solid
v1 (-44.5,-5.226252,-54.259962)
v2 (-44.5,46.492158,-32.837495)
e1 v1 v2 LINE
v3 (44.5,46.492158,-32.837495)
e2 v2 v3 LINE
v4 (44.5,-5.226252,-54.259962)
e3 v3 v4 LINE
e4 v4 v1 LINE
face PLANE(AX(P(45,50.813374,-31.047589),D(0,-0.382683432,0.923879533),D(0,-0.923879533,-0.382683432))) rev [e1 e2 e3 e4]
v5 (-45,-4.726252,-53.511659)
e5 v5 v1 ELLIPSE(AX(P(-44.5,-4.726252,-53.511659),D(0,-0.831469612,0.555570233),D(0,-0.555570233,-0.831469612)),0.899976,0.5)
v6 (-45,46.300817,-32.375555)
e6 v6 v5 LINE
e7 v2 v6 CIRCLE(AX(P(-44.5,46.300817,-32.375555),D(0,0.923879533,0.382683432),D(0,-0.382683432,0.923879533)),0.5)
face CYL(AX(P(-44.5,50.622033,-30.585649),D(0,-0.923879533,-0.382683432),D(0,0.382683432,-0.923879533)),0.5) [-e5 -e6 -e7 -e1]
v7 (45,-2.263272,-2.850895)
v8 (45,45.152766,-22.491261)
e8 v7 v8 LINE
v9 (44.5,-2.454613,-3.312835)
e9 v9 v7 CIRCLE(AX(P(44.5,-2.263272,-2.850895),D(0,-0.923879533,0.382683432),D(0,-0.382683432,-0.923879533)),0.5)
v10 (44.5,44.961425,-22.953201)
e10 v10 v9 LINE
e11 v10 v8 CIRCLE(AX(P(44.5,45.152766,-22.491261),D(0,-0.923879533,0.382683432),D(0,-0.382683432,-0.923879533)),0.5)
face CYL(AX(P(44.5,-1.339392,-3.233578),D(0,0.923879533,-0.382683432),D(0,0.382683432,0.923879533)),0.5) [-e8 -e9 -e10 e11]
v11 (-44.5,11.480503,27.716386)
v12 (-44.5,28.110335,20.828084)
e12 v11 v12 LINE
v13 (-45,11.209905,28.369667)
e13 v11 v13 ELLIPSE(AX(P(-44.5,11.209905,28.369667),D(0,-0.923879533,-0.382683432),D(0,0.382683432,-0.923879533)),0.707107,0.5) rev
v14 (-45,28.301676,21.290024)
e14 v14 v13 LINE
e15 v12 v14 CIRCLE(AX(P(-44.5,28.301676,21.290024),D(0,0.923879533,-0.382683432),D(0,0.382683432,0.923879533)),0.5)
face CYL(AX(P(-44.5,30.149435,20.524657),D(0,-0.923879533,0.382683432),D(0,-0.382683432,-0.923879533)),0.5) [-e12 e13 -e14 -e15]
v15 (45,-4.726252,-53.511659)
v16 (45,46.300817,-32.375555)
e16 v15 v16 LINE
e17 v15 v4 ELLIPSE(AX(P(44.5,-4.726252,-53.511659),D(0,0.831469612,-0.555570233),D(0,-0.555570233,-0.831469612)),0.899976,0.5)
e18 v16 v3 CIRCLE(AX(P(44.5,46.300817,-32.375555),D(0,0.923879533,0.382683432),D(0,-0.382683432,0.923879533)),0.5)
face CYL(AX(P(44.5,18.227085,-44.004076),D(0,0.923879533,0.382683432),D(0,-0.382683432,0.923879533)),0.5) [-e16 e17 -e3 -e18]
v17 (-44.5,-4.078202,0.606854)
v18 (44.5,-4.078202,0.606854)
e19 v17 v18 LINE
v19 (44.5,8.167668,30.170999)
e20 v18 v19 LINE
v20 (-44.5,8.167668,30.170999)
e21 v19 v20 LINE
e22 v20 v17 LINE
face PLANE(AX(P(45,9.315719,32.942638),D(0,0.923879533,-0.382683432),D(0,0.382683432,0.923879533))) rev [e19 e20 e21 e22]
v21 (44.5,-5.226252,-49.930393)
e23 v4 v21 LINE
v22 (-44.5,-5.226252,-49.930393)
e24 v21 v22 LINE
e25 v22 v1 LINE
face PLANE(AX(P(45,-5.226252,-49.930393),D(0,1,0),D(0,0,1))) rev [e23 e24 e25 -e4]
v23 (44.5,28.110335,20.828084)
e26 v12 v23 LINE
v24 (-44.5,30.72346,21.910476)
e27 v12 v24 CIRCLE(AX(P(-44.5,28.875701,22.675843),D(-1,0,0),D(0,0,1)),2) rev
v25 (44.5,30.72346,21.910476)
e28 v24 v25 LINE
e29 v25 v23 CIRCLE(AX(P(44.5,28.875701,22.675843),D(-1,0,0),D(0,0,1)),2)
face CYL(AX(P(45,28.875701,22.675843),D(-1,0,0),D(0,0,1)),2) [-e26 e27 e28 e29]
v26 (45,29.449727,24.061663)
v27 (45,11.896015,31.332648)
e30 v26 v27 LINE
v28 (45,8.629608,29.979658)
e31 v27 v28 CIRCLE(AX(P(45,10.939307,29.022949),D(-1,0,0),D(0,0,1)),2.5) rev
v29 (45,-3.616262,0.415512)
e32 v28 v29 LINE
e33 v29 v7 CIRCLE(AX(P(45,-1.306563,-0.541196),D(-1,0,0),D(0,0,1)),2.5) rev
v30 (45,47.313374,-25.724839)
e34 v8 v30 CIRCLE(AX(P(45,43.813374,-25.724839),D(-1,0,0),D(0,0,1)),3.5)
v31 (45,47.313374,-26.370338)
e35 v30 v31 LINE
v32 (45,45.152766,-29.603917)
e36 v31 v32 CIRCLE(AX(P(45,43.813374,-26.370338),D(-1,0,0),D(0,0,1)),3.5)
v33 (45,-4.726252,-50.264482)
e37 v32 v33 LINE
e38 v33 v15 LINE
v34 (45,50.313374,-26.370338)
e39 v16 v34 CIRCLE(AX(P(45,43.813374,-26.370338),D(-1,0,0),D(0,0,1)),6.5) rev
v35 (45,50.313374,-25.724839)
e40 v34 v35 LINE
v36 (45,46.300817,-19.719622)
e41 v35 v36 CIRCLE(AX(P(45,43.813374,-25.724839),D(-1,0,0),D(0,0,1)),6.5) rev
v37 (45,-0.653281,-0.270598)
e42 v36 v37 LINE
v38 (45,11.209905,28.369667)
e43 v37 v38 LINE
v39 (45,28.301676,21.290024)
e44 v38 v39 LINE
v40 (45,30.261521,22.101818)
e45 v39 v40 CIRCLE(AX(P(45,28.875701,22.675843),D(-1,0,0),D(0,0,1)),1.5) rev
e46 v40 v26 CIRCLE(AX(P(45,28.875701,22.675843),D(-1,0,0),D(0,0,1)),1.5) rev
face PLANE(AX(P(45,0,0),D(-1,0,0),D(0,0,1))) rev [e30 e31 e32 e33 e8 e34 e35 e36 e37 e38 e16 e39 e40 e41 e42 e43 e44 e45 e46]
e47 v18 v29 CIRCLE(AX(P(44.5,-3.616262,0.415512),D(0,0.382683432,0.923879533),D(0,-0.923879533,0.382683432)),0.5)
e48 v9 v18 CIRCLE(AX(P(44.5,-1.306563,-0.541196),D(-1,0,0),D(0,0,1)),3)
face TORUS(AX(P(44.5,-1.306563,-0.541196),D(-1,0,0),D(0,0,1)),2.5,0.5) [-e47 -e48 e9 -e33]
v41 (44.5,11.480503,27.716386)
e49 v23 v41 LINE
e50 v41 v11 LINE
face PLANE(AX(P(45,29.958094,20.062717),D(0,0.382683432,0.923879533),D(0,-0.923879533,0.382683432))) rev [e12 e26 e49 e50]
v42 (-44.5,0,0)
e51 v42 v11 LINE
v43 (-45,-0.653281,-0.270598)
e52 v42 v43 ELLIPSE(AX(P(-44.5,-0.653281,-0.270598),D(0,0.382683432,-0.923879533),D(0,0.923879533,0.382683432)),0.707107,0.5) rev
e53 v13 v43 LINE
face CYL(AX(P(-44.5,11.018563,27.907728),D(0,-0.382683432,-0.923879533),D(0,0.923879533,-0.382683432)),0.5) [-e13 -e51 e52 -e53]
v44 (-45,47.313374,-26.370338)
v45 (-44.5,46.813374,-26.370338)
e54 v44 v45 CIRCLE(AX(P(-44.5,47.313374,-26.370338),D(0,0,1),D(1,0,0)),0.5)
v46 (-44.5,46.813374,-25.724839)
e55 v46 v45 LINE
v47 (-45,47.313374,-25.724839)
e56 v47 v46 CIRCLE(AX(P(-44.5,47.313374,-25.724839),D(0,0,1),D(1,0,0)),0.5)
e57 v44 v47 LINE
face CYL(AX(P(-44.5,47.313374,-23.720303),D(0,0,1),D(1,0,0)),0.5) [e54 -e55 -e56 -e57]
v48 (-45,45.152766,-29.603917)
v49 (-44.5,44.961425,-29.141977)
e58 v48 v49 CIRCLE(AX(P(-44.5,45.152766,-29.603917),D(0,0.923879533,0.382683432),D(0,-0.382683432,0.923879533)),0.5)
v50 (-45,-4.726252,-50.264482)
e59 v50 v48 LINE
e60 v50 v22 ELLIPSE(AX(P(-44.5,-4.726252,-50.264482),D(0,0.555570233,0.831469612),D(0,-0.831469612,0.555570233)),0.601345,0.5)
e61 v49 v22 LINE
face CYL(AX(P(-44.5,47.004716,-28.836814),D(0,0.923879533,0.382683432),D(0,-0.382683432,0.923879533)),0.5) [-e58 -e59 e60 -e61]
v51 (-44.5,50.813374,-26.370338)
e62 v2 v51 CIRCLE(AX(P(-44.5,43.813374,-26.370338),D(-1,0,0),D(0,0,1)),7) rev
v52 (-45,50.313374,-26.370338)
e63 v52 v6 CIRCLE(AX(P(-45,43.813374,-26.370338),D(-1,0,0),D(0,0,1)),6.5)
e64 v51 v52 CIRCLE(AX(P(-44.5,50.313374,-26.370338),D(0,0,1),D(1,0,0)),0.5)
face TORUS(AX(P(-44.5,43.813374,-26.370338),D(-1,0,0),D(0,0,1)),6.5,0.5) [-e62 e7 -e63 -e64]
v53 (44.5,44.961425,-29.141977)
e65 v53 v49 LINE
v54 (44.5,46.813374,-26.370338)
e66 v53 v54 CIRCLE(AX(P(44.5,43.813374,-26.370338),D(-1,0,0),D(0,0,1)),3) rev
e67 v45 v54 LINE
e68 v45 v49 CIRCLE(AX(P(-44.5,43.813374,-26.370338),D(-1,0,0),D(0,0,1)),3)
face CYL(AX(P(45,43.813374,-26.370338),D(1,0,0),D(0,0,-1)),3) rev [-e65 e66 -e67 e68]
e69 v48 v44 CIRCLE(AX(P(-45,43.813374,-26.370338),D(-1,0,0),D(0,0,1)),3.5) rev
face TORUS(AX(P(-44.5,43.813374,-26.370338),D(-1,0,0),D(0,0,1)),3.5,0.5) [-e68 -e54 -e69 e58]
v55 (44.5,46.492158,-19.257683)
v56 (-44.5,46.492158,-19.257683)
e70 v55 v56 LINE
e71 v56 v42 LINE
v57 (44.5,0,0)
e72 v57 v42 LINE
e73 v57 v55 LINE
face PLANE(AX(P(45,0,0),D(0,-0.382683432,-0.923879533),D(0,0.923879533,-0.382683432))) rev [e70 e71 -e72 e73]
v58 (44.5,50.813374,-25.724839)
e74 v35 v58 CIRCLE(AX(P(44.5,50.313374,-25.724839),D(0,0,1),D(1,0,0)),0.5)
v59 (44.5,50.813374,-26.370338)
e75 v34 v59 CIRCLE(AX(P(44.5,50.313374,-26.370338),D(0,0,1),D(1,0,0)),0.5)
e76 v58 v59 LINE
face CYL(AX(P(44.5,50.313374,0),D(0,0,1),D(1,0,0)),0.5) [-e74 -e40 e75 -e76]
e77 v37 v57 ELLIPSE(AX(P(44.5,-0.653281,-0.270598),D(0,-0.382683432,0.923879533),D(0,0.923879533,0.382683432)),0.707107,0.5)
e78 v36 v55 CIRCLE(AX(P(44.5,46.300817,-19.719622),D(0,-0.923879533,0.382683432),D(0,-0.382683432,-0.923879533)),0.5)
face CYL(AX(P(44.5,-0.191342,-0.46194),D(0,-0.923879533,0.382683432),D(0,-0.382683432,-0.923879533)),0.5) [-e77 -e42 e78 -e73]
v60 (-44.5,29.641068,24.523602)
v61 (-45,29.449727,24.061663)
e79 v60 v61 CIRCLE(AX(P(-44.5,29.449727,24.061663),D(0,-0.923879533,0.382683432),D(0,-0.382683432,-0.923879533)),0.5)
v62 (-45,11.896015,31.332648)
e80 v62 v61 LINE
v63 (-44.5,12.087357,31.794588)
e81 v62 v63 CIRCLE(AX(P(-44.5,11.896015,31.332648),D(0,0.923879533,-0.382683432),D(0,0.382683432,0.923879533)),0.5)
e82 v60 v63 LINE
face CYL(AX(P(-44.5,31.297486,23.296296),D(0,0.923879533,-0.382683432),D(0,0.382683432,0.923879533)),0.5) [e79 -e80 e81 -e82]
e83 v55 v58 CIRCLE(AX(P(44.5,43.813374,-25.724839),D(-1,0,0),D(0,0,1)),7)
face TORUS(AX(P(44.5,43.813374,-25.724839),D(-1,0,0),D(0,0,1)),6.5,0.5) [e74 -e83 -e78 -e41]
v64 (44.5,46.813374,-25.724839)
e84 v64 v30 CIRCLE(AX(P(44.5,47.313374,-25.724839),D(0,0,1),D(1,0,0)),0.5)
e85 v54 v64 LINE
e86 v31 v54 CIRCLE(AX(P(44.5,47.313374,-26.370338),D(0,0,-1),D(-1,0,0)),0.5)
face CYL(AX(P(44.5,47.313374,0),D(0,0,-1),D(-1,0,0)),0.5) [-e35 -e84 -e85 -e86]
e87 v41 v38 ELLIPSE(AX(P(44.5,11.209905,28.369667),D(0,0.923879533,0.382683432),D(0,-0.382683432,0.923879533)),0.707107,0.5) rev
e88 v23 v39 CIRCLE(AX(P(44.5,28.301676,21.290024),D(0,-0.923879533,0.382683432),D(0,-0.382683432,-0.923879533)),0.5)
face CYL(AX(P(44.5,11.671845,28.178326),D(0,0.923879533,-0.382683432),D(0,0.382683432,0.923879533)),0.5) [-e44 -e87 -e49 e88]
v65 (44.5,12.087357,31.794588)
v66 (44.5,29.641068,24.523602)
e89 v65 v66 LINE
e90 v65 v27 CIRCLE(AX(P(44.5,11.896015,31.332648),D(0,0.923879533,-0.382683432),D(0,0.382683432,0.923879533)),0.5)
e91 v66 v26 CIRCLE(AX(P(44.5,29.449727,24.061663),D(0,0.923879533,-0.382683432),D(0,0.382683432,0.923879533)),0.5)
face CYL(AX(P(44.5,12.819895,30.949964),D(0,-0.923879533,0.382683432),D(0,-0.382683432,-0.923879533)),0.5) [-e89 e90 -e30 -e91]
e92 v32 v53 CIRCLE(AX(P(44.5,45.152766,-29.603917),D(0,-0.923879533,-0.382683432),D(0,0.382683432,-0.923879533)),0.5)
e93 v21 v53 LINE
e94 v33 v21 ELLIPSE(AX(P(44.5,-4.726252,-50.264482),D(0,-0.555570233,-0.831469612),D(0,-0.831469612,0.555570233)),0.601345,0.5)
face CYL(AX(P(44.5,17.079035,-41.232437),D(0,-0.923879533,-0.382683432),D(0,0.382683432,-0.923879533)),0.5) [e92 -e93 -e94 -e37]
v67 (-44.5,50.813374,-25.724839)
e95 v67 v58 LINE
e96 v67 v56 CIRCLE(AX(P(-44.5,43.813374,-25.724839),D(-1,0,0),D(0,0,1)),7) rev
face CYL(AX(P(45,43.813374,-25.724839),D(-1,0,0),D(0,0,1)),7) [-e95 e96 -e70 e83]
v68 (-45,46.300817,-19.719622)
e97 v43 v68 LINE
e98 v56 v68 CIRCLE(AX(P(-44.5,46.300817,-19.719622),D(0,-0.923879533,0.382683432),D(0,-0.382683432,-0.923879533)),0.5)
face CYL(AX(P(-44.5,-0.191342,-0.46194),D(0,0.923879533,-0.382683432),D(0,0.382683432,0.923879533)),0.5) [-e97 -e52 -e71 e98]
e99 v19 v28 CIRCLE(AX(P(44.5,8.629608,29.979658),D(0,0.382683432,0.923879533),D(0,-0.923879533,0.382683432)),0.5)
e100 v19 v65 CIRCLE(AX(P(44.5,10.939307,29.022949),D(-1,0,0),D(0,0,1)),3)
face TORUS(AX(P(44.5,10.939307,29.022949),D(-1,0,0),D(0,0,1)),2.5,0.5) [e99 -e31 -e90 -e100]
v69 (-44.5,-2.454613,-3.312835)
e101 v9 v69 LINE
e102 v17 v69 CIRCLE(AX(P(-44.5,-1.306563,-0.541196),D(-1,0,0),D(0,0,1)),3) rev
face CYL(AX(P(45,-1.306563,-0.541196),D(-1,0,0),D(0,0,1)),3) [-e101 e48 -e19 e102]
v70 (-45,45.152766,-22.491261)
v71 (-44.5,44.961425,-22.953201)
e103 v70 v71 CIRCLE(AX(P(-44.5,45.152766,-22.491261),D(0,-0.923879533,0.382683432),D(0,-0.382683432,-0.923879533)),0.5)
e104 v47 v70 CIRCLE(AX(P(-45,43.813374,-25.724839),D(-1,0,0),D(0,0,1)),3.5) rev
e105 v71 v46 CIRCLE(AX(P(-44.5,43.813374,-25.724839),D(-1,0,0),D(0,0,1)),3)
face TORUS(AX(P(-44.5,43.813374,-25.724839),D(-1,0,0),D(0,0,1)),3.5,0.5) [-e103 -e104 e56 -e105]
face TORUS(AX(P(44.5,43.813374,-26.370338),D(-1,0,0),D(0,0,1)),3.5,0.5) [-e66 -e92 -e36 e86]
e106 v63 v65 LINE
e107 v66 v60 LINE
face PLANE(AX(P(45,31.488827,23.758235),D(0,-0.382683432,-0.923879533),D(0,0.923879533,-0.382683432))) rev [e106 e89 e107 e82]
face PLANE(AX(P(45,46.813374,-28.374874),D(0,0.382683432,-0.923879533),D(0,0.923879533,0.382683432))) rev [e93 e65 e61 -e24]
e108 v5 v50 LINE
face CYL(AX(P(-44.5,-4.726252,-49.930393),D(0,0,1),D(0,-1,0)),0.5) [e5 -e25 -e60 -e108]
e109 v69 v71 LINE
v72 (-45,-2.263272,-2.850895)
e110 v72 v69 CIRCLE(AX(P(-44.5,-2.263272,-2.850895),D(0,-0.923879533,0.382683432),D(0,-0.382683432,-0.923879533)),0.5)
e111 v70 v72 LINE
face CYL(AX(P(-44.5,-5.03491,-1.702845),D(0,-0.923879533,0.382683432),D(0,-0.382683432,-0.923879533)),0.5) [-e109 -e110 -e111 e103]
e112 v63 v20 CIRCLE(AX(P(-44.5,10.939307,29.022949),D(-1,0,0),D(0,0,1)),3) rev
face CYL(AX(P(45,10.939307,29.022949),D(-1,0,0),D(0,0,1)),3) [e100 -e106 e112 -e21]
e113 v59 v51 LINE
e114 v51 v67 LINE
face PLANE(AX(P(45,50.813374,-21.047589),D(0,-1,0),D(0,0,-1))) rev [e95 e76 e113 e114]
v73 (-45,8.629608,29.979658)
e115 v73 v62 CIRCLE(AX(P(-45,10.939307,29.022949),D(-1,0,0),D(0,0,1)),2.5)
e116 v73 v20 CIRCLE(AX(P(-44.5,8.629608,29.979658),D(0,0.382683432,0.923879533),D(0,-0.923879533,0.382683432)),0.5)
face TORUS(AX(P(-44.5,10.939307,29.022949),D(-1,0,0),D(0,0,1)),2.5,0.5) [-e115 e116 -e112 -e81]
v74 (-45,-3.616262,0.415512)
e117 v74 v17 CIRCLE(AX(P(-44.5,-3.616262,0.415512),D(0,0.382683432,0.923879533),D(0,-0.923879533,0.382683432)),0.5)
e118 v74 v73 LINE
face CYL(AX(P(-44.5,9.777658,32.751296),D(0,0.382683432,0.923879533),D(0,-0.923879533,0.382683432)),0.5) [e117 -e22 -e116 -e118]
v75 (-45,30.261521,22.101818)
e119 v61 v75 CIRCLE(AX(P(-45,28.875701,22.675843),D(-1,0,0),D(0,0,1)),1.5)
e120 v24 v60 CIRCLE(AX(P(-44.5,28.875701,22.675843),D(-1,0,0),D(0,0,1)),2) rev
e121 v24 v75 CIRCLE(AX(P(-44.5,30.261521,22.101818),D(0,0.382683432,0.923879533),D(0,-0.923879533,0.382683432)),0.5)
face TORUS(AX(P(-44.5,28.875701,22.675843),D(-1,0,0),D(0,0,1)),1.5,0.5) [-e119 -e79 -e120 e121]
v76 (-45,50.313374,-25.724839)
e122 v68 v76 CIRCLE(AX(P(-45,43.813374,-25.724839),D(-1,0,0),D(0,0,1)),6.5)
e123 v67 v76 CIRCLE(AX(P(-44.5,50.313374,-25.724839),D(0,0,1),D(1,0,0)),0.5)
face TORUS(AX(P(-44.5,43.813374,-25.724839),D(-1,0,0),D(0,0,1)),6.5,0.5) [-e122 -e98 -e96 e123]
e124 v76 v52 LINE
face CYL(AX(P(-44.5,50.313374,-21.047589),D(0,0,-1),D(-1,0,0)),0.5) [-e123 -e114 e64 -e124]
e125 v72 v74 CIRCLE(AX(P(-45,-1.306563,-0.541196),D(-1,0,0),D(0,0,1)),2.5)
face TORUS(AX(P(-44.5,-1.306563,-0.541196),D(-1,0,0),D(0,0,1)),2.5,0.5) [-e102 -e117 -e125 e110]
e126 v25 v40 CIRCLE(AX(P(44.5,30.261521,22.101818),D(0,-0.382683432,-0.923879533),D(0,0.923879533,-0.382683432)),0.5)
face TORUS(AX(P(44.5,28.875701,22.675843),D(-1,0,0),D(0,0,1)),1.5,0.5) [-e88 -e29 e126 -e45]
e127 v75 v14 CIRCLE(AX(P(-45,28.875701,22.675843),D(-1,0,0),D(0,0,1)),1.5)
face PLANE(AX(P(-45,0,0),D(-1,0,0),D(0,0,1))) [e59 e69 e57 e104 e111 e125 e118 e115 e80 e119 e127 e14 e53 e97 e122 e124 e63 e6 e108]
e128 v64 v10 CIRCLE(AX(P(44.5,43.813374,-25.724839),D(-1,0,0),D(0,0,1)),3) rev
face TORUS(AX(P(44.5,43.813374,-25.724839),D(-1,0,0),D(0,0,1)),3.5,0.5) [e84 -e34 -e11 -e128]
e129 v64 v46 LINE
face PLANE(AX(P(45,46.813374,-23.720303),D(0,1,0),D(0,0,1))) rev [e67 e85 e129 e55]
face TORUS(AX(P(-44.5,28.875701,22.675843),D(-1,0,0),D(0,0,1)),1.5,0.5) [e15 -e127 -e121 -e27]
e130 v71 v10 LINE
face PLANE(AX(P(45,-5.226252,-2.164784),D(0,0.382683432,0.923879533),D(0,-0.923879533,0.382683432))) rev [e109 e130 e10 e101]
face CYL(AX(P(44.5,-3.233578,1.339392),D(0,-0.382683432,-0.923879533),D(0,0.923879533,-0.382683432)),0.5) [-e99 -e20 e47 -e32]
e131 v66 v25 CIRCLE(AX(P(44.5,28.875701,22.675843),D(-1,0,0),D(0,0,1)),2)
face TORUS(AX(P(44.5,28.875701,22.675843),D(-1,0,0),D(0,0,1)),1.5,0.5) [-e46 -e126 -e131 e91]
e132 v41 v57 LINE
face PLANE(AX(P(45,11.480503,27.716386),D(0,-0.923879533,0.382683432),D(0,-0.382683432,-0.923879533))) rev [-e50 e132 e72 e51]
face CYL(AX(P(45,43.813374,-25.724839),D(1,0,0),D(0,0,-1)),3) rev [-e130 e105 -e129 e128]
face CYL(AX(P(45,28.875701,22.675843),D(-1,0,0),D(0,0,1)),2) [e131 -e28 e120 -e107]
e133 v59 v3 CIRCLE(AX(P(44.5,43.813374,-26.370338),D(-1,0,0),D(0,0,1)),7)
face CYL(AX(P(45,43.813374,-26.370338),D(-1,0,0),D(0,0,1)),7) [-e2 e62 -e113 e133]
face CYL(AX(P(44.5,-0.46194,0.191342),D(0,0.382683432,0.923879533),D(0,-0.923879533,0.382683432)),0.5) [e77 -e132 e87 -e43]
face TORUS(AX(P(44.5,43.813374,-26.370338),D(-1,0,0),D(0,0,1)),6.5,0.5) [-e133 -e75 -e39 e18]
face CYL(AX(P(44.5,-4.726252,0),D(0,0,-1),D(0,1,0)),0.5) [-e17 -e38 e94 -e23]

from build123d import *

# Parameters (mm, degrees)
BOSS_EXTRUDE1_DEPTH = 45
FILLET1_R           = 7
FILLET3_R           = 3
FILLET4_R           = 3
FILLET5_R           = 2
FILLET6_R           = 0.5


with BuildPart() as part:
    # Sketch1 → Boss-Extrude1 (new, symmetric)
    with BuildSketch(Plane(origin=(0, 0, 0), x_dir=(0, 0, -1), z_dir=(1, 0, 0))):
        Polygon((-20.062717328, 29.958093621), (-27.716385975, 11.480502971), (0, 0), (21.04758878, 50.813374288), (31.04758878, 50.813374288), (53.62591129, -3.69551813), (54.259961961, -5.22625186), (49.93039316, -5.22625186), (28.374874228, 46.813374288), (23.720303332, 46.813374288), (2.164784401, -5.22625186), (-32.942637835, 9.31571857), (-23.758235458, 31.488827351), align=None)
    extrude(amount=BOSS_EXTRUDE1_DEPTH, both=True)

    # Fillet1
    fillet1_edges = [part.edges().sort_by_distance(p)[0] for p in [
        (0, 50.813374288, -21.04758878),
        (0, 50.813374288, -31.04758878),
    ]]
    fillet(fillet1_edges, radius=FILLET1_R)

    # Fillet3
    fillet3_edges = [part.edges().sort_by_distance(p)[0] for p in [
        (0, 46.813374288, -28.374874228),
        (0, 46.813374288, -23.720303332),
    ]]
    fillet(fillet3_edges, radius=FILLET3_R)

    # Fillet4
    fillet4_edges = [part.edges().sort_by_distance(p)[0] for p in [
        (0, -5.22625186, -2.164784401),
        (0, 9.31571857, 32.942637835),
    ]]
    fillet(fillet4_edges, radius=FILLET4_R)

    # Fillet5
    fillet5_edges = [part.edges().sort_by_distance(p)[0] for p in [
        (0, 29.958093621, 20.062717328),
        (0, 31.488827351, 23.758235458),
    ]]
    fillet(fillet5_edges, radius=FILLET5_R - 0.0001)  # a hair under: the kernel refuses the full size

    # Fillet6
    fillet6_edges = [part.edges().sort_by_distance(p)[0] for p in [
        (-45, 19.795464958, 24.27221595),
        (-45, 5.740251485, 13.858192988),
        (-45, 20.632953228, -43.548728501),
        (-45, -5.22625186, -52.09517756),
        (45, -5.22625186, -52.09517756),
        (45, 20.632953228, -43.548728501),
        (-45, 23.246079157, -9.628841259),
        (45, 23.246079157, -9.628841259),
        (-45, 50.813374288, -26.04758878),
        (-45, 49.633661574, -30.259329946),
        (-45, 49.633661574, -21.835847614),
        (45, 50.813374288, -26.04758878),
        (45, 49.633661574, -30.259329946),
        (45, 49.633661574, -21.835847614),
        (45, 5.740251485, 13.858192988),
        (-45, 19.867586363, -39.536185036),
        (45, 19.867586363, -39.536185036),
        (-45, 46.813374288, -26.04758878),
        (45, 46.813374288, -26.04758878),
        (45, 19.795464958, 24.27221595),
        (-45, 46.307783125, -28.037049014),
        (45, 46.307783125, -28.037049014),
        (-45, 46.307783125, -24.058128546),
        (45, 46.307783125, -24.058128546),
        (-45, 2.044733355, 15.388926717),
        (45, 2.044733355, 15.388926717),
        (-45, 21.253405662, -13.133017673),
        (-45, -4.078201562, -1.689246397),
        (-45, 9.791256574, 31.794587538),
        (45, 21.253405662, -13.133017673),
        (45, -4.078201562, -1.689246397),
        (45, 9.791256574, 31.794587538),
        (-45, 20.864258921, 28.159075796),
        (-45, 30.723498754, 23.441225974),
        (-45, 29.641084137, 20.828045924),
        (45, 20.864258921, 28.159075796),
        (45, 30.723498754, 23.441225974),
        (45, 29.641084137, 20.828045924),
    ]]
    fillet(fillet6_edges, radius=FILLET6_R)


solid = part.part
